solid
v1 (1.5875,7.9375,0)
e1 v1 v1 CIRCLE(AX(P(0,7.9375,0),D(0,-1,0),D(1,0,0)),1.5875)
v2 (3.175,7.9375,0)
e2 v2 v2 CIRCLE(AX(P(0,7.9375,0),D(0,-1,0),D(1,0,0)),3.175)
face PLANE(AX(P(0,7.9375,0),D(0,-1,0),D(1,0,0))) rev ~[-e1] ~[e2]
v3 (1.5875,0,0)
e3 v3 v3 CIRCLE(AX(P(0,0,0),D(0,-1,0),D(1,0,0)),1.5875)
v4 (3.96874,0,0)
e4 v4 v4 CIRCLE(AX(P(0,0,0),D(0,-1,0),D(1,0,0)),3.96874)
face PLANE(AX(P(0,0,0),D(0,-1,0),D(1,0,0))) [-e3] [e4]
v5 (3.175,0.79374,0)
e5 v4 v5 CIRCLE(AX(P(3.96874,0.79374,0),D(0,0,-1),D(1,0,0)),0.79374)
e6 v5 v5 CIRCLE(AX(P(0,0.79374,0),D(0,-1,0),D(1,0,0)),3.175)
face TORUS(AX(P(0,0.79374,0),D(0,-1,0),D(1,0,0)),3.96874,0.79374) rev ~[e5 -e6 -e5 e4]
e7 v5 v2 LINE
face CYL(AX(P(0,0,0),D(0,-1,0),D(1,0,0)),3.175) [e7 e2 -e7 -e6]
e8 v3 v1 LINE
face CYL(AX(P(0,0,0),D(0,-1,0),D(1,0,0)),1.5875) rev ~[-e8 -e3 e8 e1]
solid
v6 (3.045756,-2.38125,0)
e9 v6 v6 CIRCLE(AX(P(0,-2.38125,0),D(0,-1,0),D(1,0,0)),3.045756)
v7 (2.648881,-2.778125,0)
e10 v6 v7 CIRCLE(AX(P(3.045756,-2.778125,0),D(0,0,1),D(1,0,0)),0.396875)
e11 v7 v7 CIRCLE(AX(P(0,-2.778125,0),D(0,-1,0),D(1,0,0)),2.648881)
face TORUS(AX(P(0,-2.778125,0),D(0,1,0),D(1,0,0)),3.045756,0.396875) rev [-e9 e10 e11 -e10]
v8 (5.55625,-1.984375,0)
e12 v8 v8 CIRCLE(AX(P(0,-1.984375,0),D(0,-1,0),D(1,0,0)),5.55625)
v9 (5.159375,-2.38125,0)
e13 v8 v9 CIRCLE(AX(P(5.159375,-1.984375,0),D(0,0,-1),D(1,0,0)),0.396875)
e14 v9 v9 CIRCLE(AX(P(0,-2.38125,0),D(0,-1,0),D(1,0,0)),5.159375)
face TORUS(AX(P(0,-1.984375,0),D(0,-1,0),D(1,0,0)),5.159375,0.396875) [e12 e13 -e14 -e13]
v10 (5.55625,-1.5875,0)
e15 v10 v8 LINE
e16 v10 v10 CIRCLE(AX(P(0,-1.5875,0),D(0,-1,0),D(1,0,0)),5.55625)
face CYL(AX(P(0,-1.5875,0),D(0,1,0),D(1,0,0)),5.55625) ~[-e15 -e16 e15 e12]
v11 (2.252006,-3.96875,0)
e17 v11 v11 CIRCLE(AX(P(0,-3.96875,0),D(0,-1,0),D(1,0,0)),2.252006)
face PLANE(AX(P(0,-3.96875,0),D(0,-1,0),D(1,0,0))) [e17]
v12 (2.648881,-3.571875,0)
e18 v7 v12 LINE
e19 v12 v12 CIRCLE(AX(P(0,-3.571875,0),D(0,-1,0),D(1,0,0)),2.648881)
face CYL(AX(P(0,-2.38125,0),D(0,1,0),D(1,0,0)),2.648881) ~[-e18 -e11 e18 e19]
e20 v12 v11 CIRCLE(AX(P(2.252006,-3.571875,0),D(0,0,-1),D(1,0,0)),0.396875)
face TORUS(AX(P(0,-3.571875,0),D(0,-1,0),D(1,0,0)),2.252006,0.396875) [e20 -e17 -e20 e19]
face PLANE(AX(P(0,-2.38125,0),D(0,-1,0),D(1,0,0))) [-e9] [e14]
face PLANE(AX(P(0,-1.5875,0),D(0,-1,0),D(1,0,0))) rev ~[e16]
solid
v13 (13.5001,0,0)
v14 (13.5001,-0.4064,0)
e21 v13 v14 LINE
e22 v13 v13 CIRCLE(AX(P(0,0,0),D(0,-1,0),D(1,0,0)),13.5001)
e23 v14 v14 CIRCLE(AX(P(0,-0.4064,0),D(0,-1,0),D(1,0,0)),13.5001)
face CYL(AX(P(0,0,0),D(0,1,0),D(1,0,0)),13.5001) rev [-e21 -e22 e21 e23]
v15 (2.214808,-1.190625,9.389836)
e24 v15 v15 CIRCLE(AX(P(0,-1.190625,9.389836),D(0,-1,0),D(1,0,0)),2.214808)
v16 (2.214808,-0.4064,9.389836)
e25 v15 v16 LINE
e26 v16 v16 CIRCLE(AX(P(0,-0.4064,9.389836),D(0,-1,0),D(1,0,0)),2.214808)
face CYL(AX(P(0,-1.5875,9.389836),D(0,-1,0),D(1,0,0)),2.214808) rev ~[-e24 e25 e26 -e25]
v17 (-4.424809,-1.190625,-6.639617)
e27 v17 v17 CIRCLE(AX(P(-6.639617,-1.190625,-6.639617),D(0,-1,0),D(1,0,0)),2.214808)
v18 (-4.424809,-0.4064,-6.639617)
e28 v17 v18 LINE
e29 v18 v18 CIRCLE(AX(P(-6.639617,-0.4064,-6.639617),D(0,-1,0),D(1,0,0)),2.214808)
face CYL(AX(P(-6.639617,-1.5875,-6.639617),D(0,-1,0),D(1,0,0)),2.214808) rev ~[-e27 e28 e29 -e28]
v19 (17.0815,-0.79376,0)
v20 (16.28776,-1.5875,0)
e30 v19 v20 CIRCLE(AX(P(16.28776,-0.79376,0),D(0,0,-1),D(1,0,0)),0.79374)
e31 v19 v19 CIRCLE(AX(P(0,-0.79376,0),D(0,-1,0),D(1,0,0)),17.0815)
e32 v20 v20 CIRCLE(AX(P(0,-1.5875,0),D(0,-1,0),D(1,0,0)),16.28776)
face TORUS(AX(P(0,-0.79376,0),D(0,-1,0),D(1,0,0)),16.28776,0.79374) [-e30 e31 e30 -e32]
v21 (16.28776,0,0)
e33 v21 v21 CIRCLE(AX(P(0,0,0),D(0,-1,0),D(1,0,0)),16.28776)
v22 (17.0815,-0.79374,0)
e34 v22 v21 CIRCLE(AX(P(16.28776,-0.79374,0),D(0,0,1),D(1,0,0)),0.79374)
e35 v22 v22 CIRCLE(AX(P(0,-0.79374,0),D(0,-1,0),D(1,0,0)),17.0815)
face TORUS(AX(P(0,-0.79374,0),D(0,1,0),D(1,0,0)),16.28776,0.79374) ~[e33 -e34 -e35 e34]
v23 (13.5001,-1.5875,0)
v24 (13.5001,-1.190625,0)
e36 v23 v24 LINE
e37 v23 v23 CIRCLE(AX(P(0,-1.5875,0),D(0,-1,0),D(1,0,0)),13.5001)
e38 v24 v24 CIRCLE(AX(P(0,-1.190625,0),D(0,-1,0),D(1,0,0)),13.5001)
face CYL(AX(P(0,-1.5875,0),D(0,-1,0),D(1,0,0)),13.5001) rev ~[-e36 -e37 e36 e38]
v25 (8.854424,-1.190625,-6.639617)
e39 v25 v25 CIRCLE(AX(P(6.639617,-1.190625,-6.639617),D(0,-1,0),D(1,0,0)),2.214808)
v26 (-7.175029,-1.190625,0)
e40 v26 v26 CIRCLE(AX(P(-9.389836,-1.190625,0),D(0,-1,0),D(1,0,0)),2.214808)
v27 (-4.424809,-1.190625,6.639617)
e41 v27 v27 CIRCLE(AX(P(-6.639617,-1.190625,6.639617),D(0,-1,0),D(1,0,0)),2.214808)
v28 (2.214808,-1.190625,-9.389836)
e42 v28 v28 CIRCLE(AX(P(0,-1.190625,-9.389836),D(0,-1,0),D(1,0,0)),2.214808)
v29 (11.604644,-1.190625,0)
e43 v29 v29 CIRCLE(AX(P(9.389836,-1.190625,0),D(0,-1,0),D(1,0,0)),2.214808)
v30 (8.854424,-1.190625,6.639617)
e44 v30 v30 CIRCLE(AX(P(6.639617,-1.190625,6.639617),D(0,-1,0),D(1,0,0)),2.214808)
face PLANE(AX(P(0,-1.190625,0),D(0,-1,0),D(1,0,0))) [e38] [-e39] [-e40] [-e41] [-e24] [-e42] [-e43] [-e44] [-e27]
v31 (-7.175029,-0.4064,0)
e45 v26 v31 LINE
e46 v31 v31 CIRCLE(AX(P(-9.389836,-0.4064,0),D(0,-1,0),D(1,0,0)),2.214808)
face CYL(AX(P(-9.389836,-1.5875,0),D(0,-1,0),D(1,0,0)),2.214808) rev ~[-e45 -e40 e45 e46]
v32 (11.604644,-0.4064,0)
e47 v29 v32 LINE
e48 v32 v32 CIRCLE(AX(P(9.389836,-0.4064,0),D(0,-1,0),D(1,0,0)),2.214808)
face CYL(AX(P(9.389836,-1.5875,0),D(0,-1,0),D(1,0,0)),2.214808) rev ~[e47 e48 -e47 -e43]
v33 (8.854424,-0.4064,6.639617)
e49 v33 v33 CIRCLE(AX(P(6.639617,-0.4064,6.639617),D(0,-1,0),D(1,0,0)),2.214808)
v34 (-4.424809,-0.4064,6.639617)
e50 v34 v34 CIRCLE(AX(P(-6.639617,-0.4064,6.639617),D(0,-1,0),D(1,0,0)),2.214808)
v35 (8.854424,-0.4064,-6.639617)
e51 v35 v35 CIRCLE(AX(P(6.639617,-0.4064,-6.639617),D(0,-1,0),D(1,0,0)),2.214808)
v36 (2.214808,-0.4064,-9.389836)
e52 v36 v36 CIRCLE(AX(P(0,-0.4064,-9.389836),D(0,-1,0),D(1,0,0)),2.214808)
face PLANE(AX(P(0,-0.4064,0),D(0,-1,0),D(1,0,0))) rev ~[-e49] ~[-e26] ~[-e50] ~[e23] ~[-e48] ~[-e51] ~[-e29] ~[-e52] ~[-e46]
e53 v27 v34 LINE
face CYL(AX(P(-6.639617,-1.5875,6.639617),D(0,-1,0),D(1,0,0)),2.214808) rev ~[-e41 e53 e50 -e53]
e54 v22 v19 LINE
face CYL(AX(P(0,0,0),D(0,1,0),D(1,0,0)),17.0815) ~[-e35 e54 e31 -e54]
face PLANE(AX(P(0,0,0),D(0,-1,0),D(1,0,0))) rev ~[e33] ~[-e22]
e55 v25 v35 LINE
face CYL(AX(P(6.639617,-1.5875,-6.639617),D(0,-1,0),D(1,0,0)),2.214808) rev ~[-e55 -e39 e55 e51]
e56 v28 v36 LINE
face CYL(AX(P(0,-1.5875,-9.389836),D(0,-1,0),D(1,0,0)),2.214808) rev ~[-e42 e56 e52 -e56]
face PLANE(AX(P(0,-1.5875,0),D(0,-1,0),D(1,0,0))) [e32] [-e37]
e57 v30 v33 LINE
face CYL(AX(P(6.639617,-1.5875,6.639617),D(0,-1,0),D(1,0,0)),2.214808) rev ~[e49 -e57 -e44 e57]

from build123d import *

# Parameters (mm, degrees)
F0_R      = 17.0815
F2_DEPTH  = 1.5875
F3_R      = 5.55625
F4_DEPTH  = 0.79375
F5_R      = 2.6488813199
F6_DEPTH  = 1.5875
F8_R      = 13.5001
F9_DEPTH  = 0.396875
F12_R     = 2.2148075351
F13_DEPTH = 203.2
F14_R     = 3.175
F14_R_2   = 1.5875
F15_DEPTH = 7.9375
F16_R     = 0.79374
F17_R     = 0.396875
F18_R     = 13.5001
F19_DEPTH = 0.4064


# Not quite as in the source:
# - a fillet or chamfer is up to 0.001 mm smaller than in the source, because OpenCascade refuses the exact size
# - a feature of the source that left no trace in its solid (it failed there, or was rolled back) is left out
# - the program builds the solid bodies; features that only make, move or delete a surface that nothing else refers to are left out


with BuildPart() as f2:
    # F0 (on Front) → F2 (new body)
    with BuildSketch(Plane.XZ):
        Circle(F0_R)
    extrude(amount=F2_DEPTH)

    # F3 (on face) → F4 (join)
    with BuildSketch(Plane.XZ.offset(1.5875)):
        Circle(F3_R)
    extrude(amount=F4_DEPTH)

    # F5 (on face) → F6 (join)
    with BuildSketch(Plane.XZ.offset(2.38125)):
        Circle(F5_R)
    extrude(amount=F6_DEPTH)

    # F8 (on face) → F9 (cut)
    with BuildSketch(Plane.XZ.offset(1.5875)):
        Circle(F8_R)
    extrude(amount=-F9_DEPTH, mode=Mode.SUBTRACT)

    # F12 (on face) → F13 (cut)
    with BuildSketch(Plane.XZ.offset(1.5875)):
        with Locations((0, 9.3898363411)):
            Circle(F12_R)
        with Locations((-9.3898363411, 0)):
            Circle(F12_R)
        with Locations((-6.6396169511, 6.6396169511)):
            Circle(F12_R)
        with Locations((-6.6396169511, -6.6396169511)):
            Circle(F12_R)
        with Locations((6.6396169511, 6.6396169511)):
            Circle(F12_R)
        with Locations((9.3898363411, 0)):
            Circle(F12_R)
        with Locations((6.6396169511, -6.6396169511)):
            Circle(F12_R)
        with Locations((0, -9.3898363411)):
            Circle(F12_R)
    extrude(amount=-F13_DEPTH, mode=Mode.SUBTRACT)

    # F14 (on face) → F15 (join)
    with BuildSketch(Plane.XZ):
        Circle(F14_R)
        Circle(F14_R_2, mode=Mode.SUBTRACT)
    extrude(amount=-F15_DEPTH)

    # F16 (radius 0.79375 in the source; OpenCascade refuses exactly that, so slightly less here)
    f16_edges = [f2.edges().sort_by_distance(p)[0] for p in [
        (-17.0815, 0, 0),
        (-17.0815, -1.5875, 0),
        (-3.175, 0, 0),
    ]]
    fillet(f16_edges, radius=F16_R)

    # F17
    f17_edges = [f2.edges().sort_by_distance(p)[0] for p in [
        (-2.648881, -3.96875, 0),
        (-2.648881, -2.38125, 0),
        (-5.55625, -2.38125, 0),
    ]]
    fillet(f17_edges, radius=F17_R)

    # F18 (on face) → F19 (cut)
    with BuildSketch(Plane.XZ):
        Circle(F18_R)
    extrude(amount=F19_DEPTH, mode=Mode.SUBTRACT)


solid = f2.part
